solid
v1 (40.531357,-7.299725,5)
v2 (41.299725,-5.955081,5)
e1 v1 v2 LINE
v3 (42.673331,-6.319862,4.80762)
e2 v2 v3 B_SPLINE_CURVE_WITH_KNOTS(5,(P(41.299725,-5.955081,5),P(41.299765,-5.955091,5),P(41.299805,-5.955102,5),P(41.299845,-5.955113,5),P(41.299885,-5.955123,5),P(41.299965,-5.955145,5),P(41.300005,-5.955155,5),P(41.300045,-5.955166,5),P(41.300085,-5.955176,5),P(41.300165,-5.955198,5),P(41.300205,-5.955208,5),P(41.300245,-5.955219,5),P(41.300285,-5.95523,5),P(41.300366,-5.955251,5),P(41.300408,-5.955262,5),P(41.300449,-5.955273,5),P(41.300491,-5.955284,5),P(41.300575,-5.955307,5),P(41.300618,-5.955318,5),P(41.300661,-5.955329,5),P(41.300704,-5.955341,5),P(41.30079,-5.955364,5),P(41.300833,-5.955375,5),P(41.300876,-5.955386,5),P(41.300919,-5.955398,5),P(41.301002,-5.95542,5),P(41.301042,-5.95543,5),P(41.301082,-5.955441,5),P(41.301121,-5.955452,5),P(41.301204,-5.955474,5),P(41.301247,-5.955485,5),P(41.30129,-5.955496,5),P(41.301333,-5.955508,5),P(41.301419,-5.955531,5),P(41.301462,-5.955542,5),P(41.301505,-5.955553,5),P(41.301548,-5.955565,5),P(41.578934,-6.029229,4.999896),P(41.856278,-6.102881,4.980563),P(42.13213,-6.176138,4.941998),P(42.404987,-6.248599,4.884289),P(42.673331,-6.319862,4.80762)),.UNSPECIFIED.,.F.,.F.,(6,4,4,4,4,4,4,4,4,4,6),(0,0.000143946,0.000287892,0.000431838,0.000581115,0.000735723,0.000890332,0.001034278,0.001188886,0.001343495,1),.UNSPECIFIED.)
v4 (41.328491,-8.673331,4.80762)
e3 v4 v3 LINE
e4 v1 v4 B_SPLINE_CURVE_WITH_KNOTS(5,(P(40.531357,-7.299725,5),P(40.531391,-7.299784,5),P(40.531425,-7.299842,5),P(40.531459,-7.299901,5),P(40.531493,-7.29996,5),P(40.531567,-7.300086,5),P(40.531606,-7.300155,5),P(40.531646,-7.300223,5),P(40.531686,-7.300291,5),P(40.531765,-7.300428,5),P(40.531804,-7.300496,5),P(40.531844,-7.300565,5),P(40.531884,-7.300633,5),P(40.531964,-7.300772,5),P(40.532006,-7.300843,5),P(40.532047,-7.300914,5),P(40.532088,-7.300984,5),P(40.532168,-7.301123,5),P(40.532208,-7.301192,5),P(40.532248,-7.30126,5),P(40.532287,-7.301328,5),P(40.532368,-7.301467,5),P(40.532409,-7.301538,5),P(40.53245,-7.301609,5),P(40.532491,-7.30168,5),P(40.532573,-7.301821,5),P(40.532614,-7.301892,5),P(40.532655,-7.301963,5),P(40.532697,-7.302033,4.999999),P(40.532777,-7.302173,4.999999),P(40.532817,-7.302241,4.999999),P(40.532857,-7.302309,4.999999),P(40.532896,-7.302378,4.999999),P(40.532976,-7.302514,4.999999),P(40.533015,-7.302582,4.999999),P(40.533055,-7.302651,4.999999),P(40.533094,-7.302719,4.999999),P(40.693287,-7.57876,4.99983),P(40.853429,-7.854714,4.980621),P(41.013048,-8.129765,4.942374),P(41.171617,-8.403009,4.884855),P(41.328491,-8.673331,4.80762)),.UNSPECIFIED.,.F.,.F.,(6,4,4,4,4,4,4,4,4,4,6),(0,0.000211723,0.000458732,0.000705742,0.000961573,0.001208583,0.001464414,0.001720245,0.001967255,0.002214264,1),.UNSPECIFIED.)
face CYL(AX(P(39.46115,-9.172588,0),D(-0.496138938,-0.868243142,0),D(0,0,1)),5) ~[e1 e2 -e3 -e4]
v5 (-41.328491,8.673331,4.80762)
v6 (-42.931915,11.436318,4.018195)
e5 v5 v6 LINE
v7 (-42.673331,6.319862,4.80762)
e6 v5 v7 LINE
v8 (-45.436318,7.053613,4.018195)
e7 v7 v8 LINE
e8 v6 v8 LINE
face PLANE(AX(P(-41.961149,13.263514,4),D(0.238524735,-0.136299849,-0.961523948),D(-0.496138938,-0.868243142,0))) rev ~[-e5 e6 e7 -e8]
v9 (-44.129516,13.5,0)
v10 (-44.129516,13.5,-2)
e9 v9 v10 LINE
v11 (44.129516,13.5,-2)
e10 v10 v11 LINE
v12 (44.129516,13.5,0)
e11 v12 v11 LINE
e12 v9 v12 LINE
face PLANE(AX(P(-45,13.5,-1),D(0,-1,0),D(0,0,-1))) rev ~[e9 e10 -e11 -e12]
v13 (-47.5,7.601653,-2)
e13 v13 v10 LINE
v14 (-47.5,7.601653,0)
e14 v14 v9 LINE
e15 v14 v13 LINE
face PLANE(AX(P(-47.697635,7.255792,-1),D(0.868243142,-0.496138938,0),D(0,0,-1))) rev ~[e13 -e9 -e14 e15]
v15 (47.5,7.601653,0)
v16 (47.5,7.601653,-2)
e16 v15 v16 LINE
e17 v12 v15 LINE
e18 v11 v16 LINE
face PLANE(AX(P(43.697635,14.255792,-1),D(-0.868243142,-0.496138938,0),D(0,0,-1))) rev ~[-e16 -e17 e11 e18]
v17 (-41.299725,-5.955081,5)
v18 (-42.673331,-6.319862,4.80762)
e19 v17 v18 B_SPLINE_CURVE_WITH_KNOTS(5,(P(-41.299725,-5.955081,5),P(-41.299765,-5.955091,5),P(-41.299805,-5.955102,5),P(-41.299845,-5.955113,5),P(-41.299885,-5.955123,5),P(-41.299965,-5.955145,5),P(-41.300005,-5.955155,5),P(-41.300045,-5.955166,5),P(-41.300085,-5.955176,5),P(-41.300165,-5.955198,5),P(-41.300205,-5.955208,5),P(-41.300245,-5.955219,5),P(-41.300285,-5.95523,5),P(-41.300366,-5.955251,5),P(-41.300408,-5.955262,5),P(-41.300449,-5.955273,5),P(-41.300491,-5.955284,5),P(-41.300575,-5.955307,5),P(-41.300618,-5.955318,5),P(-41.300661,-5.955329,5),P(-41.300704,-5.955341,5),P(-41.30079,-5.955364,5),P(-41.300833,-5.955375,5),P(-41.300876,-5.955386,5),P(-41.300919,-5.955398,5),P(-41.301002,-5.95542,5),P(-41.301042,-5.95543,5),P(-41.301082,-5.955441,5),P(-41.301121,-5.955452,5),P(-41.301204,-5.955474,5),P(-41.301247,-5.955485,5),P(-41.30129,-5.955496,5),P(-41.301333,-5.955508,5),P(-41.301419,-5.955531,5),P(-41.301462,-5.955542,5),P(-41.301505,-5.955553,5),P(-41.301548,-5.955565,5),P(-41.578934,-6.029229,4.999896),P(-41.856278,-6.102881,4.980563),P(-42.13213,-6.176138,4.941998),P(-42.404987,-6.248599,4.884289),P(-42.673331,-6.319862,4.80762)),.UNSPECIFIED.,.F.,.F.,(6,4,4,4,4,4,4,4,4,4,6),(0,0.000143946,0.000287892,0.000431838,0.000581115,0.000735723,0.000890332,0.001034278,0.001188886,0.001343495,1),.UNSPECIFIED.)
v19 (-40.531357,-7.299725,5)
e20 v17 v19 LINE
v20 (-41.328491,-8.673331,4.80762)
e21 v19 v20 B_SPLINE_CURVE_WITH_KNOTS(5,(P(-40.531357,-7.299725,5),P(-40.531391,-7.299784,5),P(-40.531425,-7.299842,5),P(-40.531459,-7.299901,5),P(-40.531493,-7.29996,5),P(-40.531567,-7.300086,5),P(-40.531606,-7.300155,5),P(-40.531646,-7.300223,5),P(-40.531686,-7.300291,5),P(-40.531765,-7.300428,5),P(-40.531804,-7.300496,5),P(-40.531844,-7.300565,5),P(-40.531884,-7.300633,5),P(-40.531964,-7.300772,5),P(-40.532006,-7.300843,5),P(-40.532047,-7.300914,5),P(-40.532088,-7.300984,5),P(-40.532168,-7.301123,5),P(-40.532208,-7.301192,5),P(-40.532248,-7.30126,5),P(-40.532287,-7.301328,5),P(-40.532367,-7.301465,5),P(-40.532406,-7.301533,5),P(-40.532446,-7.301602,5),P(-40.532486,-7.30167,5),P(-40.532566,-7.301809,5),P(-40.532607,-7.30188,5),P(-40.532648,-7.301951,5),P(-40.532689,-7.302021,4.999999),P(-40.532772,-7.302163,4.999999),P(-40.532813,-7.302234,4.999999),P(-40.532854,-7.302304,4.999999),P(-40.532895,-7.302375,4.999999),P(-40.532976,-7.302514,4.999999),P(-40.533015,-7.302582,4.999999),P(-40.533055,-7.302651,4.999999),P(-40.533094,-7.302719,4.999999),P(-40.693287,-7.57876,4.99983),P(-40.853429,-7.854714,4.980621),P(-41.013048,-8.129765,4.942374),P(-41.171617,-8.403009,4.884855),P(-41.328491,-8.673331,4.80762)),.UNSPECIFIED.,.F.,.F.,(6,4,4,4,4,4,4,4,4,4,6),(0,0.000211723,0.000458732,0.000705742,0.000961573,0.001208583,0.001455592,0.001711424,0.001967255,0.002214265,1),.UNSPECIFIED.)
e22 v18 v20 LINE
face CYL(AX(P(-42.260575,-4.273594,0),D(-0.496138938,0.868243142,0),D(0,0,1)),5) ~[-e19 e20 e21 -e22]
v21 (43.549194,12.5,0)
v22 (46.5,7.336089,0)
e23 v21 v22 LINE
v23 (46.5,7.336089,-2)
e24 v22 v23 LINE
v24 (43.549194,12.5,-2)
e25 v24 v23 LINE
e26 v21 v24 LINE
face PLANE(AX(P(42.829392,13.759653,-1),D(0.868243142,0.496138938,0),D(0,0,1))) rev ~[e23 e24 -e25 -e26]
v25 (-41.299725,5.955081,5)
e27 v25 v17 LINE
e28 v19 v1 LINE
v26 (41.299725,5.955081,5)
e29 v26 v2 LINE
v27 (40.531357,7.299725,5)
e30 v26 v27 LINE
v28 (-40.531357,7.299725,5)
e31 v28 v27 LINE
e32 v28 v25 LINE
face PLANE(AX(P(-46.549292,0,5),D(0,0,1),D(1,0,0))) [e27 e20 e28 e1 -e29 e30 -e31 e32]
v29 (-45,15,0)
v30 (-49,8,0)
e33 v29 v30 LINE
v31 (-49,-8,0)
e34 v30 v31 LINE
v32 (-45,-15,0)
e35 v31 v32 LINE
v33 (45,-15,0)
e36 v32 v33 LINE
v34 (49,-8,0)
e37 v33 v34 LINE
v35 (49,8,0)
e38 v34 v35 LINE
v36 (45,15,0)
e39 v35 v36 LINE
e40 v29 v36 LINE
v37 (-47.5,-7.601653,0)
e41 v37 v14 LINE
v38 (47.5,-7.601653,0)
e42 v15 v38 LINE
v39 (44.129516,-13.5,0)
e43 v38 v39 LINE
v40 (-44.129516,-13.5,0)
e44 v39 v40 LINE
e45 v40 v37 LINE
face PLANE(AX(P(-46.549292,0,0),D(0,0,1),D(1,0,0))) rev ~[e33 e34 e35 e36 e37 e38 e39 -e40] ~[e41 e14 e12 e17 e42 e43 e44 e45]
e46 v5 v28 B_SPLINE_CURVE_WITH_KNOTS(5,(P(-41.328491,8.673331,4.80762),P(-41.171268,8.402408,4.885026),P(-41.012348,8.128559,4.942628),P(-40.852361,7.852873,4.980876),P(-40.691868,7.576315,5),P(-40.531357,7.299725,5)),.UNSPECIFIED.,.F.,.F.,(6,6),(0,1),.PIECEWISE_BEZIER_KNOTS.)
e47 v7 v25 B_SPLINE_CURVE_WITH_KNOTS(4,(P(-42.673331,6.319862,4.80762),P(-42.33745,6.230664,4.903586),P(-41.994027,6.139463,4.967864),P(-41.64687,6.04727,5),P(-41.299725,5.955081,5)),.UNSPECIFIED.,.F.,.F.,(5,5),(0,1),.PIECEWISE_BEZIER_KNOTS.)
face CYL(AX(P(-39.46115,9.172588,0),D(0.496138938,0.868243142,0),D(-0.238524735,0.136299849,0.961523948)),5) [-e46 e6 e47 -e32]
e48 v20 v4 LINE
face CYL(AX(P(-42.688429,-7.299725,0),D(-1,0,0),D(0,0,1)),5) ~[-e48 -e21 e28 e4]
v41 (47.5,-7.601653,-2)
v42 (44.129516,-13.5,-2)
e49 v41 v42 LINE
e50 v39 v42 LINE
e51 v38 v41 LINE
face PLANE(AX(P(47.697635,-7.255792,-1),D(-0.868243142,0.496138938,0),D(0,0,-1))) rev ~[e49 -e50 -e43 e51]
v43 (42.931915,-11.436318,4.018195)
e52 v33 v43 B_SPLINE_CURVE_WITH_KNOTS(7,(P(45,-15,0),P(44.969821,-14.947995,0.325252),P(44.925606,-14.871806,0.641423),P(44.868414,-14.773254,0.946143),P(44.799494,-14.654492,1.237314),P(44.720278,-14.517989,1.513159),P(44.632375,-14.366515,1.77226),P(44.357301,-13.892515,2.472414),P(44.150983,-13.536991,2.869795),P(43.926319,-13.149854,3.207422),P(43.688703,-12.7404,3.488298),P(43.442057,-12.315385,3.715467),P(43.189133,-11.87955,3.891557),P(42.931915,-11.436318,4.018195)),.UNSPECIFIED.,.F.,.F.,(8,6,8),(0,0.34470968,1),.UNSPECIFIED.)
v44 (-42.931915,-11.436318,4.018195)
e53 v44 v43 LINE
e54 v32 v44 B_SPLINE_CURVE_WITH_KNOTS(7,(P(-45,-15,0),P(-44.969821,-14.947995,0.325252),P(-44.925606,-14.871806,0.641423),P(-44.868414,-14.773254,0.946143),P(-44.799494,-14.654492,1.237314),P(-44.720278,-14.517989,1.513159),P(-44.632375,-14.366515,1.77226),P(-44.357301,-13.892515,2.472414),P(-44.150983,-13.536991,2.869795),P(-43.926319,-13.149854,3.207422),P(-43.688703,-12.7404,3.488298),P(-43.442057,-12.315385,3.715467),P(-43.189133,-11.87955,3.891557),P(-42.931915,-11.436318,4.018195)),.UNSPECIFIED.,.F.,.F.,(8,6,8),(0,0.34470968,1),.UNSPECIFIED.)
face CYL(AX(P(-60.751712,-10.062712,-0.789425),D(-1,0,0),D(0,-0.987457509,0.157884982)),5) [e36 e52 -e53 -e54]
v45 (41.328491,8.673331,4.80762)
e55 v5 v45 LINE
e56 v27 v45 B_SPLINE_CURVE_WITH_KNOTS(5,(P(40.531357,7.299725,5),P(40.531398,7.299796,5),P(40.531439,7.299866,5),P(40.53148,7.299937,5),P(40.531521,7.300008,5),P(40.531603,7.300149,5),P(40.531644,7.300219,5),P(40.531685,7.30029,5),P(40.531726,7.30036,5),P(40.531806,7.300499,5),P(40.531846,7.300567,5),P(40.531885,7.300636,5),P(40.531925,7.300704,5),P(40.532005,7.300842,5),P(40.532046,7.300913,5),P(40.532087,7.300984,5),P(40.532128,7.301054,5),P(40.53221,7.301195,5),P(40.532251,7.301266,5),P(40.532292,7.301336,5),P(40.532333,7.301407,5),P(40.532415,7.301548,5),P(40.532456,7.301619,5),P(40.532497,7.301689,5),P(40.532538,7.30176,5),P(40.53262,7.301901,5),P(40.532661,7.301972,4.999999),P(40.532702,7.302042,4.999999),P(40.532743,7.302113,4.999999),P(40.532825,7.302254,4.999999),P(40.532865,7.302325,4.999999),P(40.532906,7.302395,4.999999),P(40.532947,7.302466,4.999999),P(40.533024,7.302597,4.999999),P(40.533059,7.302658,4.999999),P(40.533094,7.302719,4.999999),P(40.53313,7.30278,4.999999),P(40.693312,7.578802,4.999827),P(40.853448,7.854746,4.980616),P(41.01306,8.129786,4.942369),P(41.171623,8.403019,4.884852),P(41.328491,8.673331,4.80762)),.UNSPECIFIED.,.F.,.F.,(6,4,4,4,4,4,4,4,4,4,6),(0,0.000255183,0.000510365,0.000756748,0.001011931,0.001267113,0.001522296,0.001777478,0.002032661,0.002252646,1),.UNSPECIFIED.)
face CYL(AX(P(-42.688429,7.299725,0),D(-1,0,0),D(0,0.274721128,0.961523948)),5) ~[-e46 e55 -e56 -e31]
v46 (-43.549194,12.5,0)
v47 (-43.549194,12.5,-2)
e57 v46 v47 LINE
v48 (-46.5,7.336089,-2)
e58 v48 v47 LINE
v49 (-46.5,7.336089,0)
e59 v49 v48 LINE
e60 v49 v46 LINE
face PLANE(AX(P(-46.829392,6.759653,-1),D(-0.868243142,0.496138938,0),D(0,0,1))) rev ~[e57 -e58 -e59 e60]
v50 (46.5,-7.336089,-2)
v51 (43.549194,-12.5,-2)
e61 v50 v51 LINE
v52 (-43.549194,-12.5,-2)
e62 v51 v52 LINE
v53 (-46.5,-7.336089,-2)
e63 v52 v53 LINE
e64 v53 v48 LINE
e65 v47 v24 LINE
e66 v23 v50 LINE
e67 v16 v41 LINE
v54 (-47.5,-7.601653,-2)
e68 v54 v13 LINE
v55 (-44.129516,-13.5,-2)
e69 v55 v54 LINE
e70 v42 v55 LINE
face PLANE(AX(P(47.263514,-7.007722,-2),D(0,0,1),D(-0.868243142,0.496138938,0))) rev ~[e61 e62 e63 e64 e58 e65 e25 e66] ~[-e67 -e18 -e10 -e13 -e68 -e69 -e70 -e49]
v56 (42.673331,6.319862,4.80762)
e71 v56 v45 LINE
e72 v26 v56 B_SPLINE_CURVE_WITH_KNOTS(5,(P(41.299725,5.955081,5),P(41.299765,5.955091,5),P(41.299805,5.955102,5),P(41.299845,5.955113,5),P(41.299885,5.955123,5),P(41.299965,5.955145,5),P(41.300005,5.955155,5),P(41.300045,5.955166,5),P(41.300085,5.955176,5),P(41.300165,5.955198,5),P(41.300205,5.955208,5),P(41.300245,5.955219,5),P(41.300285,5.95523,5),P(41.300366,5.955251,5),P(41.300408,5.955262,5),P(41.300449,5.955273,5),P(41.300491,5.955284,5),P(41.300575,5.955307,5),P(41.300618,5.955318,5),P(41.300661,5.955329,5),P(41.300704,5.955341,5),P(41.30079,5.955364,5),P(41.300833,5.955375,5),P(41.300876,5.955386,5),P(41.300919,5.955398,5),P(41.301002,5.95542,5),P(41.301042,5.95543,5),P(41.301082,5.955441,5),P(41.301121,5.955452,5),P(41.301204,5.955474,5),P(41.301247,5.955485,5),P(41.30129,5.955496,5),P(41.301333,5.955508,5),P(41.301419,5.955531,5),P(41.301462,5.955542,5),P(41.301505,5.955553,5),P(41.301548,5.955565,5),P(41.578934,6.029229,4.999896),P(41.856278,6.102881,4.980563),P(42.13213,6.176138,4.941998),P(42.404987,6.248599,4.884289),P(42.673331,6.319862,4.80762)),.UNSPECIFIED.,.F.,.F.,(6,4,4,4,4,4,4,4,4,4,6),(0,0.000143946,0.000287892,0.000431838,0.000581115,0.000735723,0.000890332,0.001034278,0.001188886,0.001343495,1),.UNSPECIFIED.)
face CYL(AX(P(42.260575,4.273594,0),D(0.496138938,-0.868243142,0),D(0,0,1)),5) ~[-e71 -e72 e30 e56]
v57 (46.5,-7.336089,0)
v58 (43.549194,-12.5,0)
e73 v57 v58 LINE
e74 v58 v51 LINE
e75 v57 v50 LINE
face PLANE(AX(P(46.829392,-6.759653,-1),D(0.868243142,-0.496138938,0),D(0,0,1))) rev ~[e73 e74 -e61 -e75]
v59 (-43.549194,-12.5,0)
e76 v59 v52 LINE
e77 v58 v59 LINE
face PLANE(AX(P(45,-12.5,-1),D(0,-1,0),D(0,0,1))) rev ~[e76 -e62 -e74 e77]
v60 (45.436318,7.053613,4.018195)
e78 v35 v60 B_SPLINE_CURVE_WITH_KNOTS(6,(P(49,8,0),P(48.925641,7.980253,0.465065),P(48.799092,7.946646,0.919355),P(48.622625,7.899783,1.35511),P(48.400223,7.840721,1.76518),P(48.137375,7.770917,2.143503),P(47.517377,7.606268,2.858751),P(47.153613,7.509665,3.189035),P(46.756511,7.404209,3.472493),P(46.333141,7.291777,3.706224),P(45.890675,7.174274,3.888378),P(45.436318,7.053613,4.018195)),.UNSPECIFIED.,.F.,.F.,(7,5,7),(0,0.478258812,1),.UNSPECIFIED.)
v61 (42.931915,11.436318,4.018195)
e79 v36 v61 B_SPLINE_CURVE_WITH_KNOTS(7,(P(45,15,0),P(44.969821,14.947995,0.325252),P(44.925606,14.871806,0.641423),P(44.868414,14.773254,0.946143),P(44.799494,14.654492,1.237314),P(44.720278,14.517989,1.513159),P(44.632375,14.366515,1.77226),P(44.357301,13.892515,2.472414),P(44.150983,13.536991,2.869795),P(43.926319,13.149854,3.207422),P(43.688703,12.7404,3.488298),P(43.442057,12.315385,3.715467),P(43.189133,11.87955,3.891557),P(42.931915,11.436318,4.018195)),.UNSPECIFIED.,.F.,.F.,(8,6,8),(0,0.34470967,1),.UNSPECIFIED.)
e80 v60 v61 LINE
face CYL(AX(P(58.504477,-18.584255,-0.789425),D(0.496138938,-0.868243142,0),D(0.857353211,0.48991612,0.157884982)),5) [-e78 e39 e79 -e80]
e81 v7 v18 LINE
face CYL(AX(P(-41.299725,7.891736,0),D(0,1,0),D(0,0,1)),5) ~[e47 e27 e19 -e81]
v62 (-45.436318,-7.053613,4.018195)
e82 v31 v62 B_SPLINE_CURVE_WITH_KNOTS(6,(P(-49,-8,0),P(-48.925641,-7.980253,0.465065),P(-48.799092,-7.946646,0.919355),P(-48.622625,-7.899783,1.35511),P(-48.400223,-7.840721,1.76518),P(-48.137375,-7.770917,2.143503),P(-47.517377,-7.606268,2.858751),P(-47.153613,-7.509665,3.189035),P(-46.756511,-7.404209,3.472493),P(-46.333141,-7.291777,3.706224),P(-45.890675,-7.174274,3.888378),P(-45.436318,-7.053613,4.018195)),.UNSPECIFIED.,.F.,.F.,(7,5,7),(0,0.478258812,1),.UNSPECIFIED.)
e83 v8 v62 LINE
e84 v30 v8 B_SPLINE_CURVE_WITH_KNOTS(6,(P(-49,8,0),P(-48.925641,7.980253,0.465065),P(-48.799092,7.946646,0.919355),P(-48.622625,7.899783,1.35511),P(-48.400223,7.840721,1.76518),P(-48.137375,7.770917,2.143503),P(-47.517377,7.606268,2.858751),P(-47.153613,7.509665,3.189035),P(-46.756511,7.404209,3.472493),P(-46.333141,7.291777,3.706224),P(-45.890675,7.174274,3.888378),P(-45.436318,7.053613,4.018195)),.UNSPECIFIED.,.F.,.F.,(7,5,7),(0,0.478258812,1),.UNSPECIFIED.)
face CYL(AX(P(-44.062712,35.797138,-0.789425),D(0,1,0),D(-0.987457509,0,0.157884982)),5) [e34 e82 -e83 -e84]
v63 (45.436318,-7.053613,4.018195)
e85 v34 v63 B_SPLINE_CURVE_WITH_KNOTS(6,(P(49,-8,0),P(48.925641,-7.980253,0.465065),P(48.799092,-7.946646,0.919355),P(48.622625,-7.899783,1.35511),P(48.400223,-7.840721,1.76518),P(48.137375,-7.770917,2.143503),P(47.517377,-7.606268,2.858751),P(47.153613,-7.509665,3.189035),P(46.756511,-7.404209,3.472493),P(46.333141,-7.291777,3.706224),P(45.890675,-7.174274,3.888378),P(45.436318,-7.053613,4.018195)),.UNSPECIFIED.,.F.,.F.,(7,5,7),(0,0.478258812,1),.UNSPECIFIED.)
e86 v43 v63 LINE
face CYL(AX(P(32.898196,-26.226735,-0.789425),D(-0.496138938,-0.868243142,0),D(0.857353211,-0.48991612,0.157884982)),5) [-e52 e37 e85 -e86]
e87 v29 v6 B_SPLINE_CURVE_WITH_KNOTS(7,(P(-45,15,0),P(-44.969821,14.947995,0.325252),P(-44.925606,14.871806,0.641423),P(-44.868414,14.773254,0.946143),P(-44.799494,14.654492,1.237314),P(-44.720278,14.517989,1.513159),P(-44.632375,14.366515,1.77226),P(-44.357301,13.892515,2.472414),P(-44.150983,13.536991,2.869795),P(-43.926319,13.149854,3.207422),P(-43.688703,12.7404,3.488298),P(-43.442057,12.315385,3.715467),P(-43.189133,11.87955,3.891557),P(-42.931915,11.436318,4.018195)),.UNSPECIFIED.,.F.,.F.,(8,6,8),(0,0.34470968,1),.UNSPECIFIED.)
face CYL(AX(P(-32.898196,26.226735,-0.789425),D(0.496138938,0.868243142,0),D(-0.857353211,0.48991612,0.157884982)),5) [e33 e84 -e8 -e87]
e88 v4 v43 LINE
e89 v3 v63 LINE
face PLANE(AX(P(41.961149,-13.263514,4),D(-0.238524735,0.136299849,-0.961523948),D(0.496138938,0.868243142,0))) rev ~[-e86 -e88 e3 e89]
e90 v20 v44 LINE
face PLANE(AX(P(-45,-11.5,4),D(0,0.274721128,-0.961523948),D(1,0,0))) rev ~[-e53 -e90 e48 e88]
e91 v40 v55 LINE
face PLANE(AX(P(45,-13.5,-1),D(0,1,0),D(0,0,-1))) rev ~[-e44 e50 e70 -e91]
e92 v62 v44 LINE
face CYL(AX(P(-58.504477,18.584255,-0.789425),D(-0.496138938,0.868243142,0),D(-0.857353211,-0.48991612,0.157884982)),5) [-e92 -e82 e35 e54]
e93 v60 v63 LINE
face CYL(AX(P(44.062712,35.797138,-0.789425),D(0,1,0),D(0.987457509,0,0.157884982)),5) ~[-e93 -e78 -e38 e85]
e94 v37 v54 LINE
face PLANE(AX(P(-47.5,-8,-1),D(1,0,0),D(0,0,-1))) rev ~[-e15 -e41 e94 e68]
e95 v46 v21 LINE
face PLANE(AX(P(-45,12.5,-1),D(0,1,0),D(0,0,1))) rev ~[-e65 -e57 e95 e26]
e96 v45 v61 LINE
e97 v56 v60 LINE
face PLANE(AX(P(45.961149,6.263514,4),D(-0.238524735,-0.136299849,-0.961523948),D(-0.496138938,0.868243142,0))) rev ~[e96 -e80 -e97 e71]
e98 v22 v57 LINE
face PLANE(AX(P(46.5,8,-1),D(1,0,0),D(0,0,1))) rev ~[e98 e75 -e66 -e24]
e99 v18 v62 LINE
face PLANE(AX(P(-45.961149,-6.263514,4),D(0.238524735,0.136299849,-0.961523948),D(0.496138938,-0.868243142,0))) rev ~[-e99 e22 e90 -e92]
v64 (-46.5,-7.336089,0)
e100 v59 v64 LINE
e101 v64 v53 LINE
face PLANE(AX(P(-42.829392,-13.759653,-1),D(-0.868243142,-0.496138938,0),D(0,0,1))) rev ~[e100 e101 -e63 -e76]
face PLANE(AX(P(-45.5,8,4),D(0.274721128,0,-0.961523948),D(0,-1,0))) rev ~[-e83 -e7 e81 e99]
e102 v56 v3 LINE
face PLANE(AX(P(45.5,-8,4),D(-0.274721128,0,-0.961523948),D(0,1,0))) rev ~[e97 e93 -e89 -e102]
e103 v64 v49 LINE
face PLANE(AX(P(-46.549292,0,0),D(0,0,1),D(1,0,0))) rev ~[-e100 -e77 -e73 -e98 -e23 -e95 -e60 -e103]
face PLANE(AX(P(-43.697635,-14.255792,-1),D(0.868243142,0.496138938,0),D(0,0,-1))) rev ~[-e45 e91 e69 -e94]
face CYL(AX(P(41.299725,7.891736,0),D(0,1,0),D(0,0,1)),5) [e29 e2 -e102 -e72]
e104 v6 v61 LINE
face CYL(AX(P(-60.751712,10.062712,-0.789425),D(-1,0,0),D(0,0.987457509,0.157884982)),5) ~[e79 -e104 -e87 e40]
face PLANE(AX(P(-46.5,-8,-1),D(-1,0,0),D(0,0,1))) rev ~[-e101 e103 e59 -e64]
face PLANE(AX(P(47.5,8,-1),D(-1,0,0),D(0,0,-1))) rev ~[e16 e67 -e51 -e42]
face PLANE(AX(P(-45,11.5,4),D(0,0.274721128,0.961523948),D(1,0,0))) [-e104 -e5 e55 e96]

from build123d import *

# Parameters (mm, degrees)
F0_W         = 90
F0_H         = 30
F1_DEPTH     = 5
F2_W         = 1
F2_H         = 2
F4_SIZE2     = 2
F4_SIZE      = 7
F5_T1_DEPTH  = 121.5034235835
F5_T3_DEPTH  = 85.3768581194
F5_T5_DEPTH  = 51.611107996
F5_T7_DEPTH  = 15.783471497
F5_T9_DEPTH  = 71.594276912
F5_T11_DEPTH = 5.6424225565
F5_T13_DEPTH = 51.611107996
F5_T15_DEPTH = 5.6424225565
F5_T17_DEPTH = 51.611107996
F5_T19_DEPTH = 5.6424225565
F5_T21_DEPTH = 5.6424225565
F5_T23_DEPTH = 51.611107996


# Not quite as in the source:
# - a fillet or chamfer that OpenCascade refuses, or shapes differently, is made with other operations: its cross-section is extruded or revolved along the edge and cut away or added


with BuildPart() as f1:
    # F0 (on Top) → F1 (new body)
    with BuildSketch(Plane.XY):
        Polygon((-45, -15), (-45, 15), (-49, 8), (-49, -8), align=None)
        Polygon((49, 8), (45, 15), (45, -15), (49, -8), align=None)
        Rectangle(F0_W, F0_H)
    extrude(amount=F1_DEPTH)

    # F3: sweep along a path in F3_path
    with BuildLine(Plane(origin=(45, -15, 0), x_dir=(0, -1, 0), z_dir=(0, 0, -1))) as f3_path:
        Line((0, 0), (0, 90))
        Line((0, 90), (-7, 94))
        Line((-7, 94), (-23, 94))
        Line((-23, 94), (-30, 90))
        Line((-30, 90), (-30, 0))
        Line((-30, 0), (-23, -4))
        Line((-23, -4), (-7, -4))
        Line((-7, -4), (0, 0))
    # F2 (on Right) → F3 (sweep)
    with BuildSketch(Plane.YZ):
        with Locations((-13, -1)):
            Rectangle(F2_W, F2_H)
    sweep(path=f3_path.line, transition=Transition.RIGHT)

    # F4
    f4_edges = [f1.edges().sort_by_distance(p)[0] for p in [
        (-49, 0, 5),
        (-47, -11.5, 5),
        (-47, 11.5, 5),
        (47, -11.5, 5),
        (49, 0, 5),
        (47, 11.5, 5),
        (0, -15, 5),
        (0, 15, 5),
    ]]
    f4_side = f1.faces().sort_by_distance((0, 0, 5))[0]
    chamfer(f4_edges, length=F4_SIZE, length2=F4_SIZE2, reference=f4_side)

    # F5: fillet of radius 5 on 16 edges, made by hand

    # F5_s2 → F5_t1 (cut)
    with BuildSketch(Plane.YZ.offset(-60.7517117917)):
        with BuildLine():
            ThreePointArc((15, 0), (13.8034764966, 2.5282074371), (11.4363180932, 4.0181948305))
            Line((11.4363180932, 4.0181948305), (15, 3))
            Line((15, 3), (15, 0))
        make_face()
        with BuildLine():
            ThreePointArc((-15, 0), (-13.8034764966, 2.5282074371), (-11.4363180932, 4.0181948305))
            Line((-11.4363180932, 4.0181948305), (-15, 3))
            Line((-15, 3), (-15, 0))
        make_face()
    extrude(amount=F5_T1_DEPTH, mode=Mode.SUBTRACT)

    # F5_s4 → F5_t3 (cut)
    with BuildSketch(Plane.YZ.offset(-42.6884290597)):
        with BuildLine():
            ThreePointArc((8.6733309163, 4.8076197382), (7.9932313362, 4.9516713689), (7.2997252768, 5))
            Line((7.2997252768, 5), (8, 5))
            Line((8, 5), (8.6733309163, 4.8076197382))
        make_face()
        with BuildLine():
            ThreePointArc((-7.2997252768, 5), (-7.9932313362, 4.9516713689), (-8.6733309163, 4.8076197382))
            Line((-8.6733309163, 4.8076197382), (-8, 5))
            Line((-8, 5), (-7.2997252768, 5))
        make_face()
    extrude(amount=F5_T3_DEPTH, mode=Mode.SUBTRACT)

    # F5_s6 → F5_t5 (cut)
    with BuildSketch(Plane(origin=(-22.4066273783, 39.211597912, 0), x_dir=(0, 0, 1), z_dir=(0.4961389384, -0.8682431421, 0))):
        with BuildLine():
            ThreePointArc((0, 46.513025471), (2.5282074371, 45.3165019675), (4.0181948305, 42.9493435641))
            Line((4.0181948305, 42.9493435641), (3, 46.513025471))
            Line((3, 46.513025471), (0, 46.513025471))
        make_face()
    extrude(amount=F5_T5_DEPTH, mode=Mode.SUBTRACT)

    # F5_s8 → F5_t7 (cut)
    with BuildSketch(Plane.XZ.offset(-7.8917357485)):
        with BuildLine():
            ThreePointArc((-41.2997252768, 5), (-41.9932313362, 4.9516713689), (-42.6733309163, 4.8076197382))
            Line((-42.6733309163, 4.8076197382), (-42, 5))
            Line((-42, 5), (-41.2997252768, 5))
        make_face()
        with BuildLine():
            ThreePointArc((41.2997252768, 5), (41.9932313362, 4.9516713689), (42.6733309163, 4.8076197382))
            Line((42.6733309163, 4.8076197382), (42, 5))
            Line((42, 5), (41.2997252768, 5))
        make_face()
    extrude(amount=F5_T7_DEPTH, mode=Mode.SUBTRACT)

    # F5_s10 → F5_t9 (cut)
    with BuildSketch(Plane.XZ.offset(-35.797138456)):
        with BuildLine():
            ThreePointArc((-49, 0), (-47.8034764966, 2.5282074371), (-45.4363180932, 4.0181948305))
            Line((-45.4363180932, 4.0181948305), (-49, 3))
            Line((-49, 3), (-49, 0))
        make_face()
        with BuildLine():
            ThreePointArc((49, 0), (47.8034764966, 2.5282074371), (45.4363180932, 4.0181948305))
            Line((45.4363180932, 4.0181948305), (49, 3))
            Line((49, 3), (49, 0))
        make_face()
    extrude(amount=F5_T9_DEPTH, mode=Mode.SUBTRACT)

    # F5_s12 → F5_t11 (cut)
    with BuildSketch(Plane(origin=(-8.5616705046, 14.982923383, 0), x_dir=(0, 0, 1), z_dir=(0.4961389384, -0.8682431421, 0))):
        with BuildLine():
            ThreePointArc((5, 38.8127507478), (4.9516713689, 39.5062568072), (4.8076197382, 40.1863563872))
            Line((4.8076197382, 40.1863563872), (5, 39.513025471))
            Line((5, 39.513025471), (5, 38.8127507478))
        make_face()
    extrude(amount=F5_T11_DEPTH, mode=Mode.SUBTRACT)

    # F5_s14 → F5_t13 (cut)
    with BuildSketch(Plane(origin=(3.1996529503, 5.599392663, 0), x_dir=(0, 0, 1), z_dir=(-0.4961389384, -0.8682431421, 0))):
        with BuildLine():
            ThreePointArc((0, 46.513025471), (2.5282074371, 45.3165019675), (4.0181948305, 42.9493435641))
            Line((4.0181948305, 42.9493435641), (3, 46.513025471))
            Line((3, 46.513025471), (0, 46.513025471))
        make_face()
    extrude(amount=F5_T13_DEPTH, mode=Mode.SUBTRACT)

    # F5_s16 → F5_t15 (cut)
    with BuildSketch(Plane(origin=(-5.7622449676, -10.0839286934, 0), x_dir=(0, 0, 1), z_dir=(-0.4961389384, -0.8682431421, 0))):
        with BuildLine():
            ThreePointArc((4.8076197382, 40.1863563872), (4.9516713689, 39.5062568072), (5, 38.8127507478))
            Line((5, 38.8127507478), (5, 39.513025471))
            Line((5, 39.513025471), (4.8076197382, 40.1863563872))
        make_face()
    extrude(amount=F5_T15_DEPTH, mode=Mode.SUBTRACT)

    # F5_s18 → F5_t17 (cut)
    with BuildSketch(Plane(origin=(22.4066273783, -39.211597912, 0), x_dir=(0, 0, 1), z_dir=(-0.4961389384, 0.8682431421, 0))):
        with BuildLine():
            ThreePointArc((0, 46.513025471), (2.5282074371, 45.3165019675), (4.0181948305, 42.9493435641))
            Line((4.0181948305, 42.9493435641), (3, 46.513025471))
            Line((3, 46.513025471), (0, 46.513025471))
        make_face()
    extrude(amount=F5_T17_DEPTH, mode=Mode.SUBTRACT)

    # F5_s20 → F5_t19 (cut)
    with BuildSketch(Plane(origin=(8.5616705046, -14.982923383, 0), x_dir=(0, 0, 1), z_dir=(-0.4961389384, 0.8682431421, 0))):
        with BuildLine():
            ThreePointArc((5, 38.8127507478), (4.9516713689, 39.5062568072), (4.8076197382, 40.1863563872))
            Line((4.8076197382, 40.1863563872), (5, 39.513025471))
            Line((5, 39.513025471), (5, 38.8127507478))
        make_face()
    extrude(amount=F5_T19_DEPTH, mode=Mode.SUBTRACT)

    # F5_s22 → F5_t21 (cut)
    with BuildSketch(Plane(origin=(5.7622449676, 10.0839286934, 0), x_dir=(0, 0, 1), z_dir=(0.4961389384, 0.8682431421, 0))):
        with BuildLine():
            ThreePointArc((5, 38.8127507478), (4.9516713689, 39.5062568072), (4.8076197382, 40.1863563872))
            Line((4.8076197382, 40.1863563872), (5, 39.513025471))
            Line((5, 39.513025471), (5, 38.8127507478))
        make_face()
    extrude(amount=F5_T21_DEPTH, mode=Mode.SUBTRACT)

    # F5_s24 → F5_t23 (cut)
    with BuildSketch(Plane(origin=(-3.1996529503, -5.599392663, 0), x_dir=(0, 0, 1), z_dir=(0.4961389384, 0.8682431421, 0))):
        with BuildLine():
            ThreePointArc((0, 46.513025471), (2.5282074371, 45.3165019675), (4.0181948305, 42.9493435641))
            Line((4.0181948305, 42.9493435641), (3, 46.513025471))
            Line((3, 46.513025471), (0, 46.513025471))
        make_face()
    extrude(amount=F5_T23_DEPTH, mode=Mode.SUBTRACT)


solid = f1.part
